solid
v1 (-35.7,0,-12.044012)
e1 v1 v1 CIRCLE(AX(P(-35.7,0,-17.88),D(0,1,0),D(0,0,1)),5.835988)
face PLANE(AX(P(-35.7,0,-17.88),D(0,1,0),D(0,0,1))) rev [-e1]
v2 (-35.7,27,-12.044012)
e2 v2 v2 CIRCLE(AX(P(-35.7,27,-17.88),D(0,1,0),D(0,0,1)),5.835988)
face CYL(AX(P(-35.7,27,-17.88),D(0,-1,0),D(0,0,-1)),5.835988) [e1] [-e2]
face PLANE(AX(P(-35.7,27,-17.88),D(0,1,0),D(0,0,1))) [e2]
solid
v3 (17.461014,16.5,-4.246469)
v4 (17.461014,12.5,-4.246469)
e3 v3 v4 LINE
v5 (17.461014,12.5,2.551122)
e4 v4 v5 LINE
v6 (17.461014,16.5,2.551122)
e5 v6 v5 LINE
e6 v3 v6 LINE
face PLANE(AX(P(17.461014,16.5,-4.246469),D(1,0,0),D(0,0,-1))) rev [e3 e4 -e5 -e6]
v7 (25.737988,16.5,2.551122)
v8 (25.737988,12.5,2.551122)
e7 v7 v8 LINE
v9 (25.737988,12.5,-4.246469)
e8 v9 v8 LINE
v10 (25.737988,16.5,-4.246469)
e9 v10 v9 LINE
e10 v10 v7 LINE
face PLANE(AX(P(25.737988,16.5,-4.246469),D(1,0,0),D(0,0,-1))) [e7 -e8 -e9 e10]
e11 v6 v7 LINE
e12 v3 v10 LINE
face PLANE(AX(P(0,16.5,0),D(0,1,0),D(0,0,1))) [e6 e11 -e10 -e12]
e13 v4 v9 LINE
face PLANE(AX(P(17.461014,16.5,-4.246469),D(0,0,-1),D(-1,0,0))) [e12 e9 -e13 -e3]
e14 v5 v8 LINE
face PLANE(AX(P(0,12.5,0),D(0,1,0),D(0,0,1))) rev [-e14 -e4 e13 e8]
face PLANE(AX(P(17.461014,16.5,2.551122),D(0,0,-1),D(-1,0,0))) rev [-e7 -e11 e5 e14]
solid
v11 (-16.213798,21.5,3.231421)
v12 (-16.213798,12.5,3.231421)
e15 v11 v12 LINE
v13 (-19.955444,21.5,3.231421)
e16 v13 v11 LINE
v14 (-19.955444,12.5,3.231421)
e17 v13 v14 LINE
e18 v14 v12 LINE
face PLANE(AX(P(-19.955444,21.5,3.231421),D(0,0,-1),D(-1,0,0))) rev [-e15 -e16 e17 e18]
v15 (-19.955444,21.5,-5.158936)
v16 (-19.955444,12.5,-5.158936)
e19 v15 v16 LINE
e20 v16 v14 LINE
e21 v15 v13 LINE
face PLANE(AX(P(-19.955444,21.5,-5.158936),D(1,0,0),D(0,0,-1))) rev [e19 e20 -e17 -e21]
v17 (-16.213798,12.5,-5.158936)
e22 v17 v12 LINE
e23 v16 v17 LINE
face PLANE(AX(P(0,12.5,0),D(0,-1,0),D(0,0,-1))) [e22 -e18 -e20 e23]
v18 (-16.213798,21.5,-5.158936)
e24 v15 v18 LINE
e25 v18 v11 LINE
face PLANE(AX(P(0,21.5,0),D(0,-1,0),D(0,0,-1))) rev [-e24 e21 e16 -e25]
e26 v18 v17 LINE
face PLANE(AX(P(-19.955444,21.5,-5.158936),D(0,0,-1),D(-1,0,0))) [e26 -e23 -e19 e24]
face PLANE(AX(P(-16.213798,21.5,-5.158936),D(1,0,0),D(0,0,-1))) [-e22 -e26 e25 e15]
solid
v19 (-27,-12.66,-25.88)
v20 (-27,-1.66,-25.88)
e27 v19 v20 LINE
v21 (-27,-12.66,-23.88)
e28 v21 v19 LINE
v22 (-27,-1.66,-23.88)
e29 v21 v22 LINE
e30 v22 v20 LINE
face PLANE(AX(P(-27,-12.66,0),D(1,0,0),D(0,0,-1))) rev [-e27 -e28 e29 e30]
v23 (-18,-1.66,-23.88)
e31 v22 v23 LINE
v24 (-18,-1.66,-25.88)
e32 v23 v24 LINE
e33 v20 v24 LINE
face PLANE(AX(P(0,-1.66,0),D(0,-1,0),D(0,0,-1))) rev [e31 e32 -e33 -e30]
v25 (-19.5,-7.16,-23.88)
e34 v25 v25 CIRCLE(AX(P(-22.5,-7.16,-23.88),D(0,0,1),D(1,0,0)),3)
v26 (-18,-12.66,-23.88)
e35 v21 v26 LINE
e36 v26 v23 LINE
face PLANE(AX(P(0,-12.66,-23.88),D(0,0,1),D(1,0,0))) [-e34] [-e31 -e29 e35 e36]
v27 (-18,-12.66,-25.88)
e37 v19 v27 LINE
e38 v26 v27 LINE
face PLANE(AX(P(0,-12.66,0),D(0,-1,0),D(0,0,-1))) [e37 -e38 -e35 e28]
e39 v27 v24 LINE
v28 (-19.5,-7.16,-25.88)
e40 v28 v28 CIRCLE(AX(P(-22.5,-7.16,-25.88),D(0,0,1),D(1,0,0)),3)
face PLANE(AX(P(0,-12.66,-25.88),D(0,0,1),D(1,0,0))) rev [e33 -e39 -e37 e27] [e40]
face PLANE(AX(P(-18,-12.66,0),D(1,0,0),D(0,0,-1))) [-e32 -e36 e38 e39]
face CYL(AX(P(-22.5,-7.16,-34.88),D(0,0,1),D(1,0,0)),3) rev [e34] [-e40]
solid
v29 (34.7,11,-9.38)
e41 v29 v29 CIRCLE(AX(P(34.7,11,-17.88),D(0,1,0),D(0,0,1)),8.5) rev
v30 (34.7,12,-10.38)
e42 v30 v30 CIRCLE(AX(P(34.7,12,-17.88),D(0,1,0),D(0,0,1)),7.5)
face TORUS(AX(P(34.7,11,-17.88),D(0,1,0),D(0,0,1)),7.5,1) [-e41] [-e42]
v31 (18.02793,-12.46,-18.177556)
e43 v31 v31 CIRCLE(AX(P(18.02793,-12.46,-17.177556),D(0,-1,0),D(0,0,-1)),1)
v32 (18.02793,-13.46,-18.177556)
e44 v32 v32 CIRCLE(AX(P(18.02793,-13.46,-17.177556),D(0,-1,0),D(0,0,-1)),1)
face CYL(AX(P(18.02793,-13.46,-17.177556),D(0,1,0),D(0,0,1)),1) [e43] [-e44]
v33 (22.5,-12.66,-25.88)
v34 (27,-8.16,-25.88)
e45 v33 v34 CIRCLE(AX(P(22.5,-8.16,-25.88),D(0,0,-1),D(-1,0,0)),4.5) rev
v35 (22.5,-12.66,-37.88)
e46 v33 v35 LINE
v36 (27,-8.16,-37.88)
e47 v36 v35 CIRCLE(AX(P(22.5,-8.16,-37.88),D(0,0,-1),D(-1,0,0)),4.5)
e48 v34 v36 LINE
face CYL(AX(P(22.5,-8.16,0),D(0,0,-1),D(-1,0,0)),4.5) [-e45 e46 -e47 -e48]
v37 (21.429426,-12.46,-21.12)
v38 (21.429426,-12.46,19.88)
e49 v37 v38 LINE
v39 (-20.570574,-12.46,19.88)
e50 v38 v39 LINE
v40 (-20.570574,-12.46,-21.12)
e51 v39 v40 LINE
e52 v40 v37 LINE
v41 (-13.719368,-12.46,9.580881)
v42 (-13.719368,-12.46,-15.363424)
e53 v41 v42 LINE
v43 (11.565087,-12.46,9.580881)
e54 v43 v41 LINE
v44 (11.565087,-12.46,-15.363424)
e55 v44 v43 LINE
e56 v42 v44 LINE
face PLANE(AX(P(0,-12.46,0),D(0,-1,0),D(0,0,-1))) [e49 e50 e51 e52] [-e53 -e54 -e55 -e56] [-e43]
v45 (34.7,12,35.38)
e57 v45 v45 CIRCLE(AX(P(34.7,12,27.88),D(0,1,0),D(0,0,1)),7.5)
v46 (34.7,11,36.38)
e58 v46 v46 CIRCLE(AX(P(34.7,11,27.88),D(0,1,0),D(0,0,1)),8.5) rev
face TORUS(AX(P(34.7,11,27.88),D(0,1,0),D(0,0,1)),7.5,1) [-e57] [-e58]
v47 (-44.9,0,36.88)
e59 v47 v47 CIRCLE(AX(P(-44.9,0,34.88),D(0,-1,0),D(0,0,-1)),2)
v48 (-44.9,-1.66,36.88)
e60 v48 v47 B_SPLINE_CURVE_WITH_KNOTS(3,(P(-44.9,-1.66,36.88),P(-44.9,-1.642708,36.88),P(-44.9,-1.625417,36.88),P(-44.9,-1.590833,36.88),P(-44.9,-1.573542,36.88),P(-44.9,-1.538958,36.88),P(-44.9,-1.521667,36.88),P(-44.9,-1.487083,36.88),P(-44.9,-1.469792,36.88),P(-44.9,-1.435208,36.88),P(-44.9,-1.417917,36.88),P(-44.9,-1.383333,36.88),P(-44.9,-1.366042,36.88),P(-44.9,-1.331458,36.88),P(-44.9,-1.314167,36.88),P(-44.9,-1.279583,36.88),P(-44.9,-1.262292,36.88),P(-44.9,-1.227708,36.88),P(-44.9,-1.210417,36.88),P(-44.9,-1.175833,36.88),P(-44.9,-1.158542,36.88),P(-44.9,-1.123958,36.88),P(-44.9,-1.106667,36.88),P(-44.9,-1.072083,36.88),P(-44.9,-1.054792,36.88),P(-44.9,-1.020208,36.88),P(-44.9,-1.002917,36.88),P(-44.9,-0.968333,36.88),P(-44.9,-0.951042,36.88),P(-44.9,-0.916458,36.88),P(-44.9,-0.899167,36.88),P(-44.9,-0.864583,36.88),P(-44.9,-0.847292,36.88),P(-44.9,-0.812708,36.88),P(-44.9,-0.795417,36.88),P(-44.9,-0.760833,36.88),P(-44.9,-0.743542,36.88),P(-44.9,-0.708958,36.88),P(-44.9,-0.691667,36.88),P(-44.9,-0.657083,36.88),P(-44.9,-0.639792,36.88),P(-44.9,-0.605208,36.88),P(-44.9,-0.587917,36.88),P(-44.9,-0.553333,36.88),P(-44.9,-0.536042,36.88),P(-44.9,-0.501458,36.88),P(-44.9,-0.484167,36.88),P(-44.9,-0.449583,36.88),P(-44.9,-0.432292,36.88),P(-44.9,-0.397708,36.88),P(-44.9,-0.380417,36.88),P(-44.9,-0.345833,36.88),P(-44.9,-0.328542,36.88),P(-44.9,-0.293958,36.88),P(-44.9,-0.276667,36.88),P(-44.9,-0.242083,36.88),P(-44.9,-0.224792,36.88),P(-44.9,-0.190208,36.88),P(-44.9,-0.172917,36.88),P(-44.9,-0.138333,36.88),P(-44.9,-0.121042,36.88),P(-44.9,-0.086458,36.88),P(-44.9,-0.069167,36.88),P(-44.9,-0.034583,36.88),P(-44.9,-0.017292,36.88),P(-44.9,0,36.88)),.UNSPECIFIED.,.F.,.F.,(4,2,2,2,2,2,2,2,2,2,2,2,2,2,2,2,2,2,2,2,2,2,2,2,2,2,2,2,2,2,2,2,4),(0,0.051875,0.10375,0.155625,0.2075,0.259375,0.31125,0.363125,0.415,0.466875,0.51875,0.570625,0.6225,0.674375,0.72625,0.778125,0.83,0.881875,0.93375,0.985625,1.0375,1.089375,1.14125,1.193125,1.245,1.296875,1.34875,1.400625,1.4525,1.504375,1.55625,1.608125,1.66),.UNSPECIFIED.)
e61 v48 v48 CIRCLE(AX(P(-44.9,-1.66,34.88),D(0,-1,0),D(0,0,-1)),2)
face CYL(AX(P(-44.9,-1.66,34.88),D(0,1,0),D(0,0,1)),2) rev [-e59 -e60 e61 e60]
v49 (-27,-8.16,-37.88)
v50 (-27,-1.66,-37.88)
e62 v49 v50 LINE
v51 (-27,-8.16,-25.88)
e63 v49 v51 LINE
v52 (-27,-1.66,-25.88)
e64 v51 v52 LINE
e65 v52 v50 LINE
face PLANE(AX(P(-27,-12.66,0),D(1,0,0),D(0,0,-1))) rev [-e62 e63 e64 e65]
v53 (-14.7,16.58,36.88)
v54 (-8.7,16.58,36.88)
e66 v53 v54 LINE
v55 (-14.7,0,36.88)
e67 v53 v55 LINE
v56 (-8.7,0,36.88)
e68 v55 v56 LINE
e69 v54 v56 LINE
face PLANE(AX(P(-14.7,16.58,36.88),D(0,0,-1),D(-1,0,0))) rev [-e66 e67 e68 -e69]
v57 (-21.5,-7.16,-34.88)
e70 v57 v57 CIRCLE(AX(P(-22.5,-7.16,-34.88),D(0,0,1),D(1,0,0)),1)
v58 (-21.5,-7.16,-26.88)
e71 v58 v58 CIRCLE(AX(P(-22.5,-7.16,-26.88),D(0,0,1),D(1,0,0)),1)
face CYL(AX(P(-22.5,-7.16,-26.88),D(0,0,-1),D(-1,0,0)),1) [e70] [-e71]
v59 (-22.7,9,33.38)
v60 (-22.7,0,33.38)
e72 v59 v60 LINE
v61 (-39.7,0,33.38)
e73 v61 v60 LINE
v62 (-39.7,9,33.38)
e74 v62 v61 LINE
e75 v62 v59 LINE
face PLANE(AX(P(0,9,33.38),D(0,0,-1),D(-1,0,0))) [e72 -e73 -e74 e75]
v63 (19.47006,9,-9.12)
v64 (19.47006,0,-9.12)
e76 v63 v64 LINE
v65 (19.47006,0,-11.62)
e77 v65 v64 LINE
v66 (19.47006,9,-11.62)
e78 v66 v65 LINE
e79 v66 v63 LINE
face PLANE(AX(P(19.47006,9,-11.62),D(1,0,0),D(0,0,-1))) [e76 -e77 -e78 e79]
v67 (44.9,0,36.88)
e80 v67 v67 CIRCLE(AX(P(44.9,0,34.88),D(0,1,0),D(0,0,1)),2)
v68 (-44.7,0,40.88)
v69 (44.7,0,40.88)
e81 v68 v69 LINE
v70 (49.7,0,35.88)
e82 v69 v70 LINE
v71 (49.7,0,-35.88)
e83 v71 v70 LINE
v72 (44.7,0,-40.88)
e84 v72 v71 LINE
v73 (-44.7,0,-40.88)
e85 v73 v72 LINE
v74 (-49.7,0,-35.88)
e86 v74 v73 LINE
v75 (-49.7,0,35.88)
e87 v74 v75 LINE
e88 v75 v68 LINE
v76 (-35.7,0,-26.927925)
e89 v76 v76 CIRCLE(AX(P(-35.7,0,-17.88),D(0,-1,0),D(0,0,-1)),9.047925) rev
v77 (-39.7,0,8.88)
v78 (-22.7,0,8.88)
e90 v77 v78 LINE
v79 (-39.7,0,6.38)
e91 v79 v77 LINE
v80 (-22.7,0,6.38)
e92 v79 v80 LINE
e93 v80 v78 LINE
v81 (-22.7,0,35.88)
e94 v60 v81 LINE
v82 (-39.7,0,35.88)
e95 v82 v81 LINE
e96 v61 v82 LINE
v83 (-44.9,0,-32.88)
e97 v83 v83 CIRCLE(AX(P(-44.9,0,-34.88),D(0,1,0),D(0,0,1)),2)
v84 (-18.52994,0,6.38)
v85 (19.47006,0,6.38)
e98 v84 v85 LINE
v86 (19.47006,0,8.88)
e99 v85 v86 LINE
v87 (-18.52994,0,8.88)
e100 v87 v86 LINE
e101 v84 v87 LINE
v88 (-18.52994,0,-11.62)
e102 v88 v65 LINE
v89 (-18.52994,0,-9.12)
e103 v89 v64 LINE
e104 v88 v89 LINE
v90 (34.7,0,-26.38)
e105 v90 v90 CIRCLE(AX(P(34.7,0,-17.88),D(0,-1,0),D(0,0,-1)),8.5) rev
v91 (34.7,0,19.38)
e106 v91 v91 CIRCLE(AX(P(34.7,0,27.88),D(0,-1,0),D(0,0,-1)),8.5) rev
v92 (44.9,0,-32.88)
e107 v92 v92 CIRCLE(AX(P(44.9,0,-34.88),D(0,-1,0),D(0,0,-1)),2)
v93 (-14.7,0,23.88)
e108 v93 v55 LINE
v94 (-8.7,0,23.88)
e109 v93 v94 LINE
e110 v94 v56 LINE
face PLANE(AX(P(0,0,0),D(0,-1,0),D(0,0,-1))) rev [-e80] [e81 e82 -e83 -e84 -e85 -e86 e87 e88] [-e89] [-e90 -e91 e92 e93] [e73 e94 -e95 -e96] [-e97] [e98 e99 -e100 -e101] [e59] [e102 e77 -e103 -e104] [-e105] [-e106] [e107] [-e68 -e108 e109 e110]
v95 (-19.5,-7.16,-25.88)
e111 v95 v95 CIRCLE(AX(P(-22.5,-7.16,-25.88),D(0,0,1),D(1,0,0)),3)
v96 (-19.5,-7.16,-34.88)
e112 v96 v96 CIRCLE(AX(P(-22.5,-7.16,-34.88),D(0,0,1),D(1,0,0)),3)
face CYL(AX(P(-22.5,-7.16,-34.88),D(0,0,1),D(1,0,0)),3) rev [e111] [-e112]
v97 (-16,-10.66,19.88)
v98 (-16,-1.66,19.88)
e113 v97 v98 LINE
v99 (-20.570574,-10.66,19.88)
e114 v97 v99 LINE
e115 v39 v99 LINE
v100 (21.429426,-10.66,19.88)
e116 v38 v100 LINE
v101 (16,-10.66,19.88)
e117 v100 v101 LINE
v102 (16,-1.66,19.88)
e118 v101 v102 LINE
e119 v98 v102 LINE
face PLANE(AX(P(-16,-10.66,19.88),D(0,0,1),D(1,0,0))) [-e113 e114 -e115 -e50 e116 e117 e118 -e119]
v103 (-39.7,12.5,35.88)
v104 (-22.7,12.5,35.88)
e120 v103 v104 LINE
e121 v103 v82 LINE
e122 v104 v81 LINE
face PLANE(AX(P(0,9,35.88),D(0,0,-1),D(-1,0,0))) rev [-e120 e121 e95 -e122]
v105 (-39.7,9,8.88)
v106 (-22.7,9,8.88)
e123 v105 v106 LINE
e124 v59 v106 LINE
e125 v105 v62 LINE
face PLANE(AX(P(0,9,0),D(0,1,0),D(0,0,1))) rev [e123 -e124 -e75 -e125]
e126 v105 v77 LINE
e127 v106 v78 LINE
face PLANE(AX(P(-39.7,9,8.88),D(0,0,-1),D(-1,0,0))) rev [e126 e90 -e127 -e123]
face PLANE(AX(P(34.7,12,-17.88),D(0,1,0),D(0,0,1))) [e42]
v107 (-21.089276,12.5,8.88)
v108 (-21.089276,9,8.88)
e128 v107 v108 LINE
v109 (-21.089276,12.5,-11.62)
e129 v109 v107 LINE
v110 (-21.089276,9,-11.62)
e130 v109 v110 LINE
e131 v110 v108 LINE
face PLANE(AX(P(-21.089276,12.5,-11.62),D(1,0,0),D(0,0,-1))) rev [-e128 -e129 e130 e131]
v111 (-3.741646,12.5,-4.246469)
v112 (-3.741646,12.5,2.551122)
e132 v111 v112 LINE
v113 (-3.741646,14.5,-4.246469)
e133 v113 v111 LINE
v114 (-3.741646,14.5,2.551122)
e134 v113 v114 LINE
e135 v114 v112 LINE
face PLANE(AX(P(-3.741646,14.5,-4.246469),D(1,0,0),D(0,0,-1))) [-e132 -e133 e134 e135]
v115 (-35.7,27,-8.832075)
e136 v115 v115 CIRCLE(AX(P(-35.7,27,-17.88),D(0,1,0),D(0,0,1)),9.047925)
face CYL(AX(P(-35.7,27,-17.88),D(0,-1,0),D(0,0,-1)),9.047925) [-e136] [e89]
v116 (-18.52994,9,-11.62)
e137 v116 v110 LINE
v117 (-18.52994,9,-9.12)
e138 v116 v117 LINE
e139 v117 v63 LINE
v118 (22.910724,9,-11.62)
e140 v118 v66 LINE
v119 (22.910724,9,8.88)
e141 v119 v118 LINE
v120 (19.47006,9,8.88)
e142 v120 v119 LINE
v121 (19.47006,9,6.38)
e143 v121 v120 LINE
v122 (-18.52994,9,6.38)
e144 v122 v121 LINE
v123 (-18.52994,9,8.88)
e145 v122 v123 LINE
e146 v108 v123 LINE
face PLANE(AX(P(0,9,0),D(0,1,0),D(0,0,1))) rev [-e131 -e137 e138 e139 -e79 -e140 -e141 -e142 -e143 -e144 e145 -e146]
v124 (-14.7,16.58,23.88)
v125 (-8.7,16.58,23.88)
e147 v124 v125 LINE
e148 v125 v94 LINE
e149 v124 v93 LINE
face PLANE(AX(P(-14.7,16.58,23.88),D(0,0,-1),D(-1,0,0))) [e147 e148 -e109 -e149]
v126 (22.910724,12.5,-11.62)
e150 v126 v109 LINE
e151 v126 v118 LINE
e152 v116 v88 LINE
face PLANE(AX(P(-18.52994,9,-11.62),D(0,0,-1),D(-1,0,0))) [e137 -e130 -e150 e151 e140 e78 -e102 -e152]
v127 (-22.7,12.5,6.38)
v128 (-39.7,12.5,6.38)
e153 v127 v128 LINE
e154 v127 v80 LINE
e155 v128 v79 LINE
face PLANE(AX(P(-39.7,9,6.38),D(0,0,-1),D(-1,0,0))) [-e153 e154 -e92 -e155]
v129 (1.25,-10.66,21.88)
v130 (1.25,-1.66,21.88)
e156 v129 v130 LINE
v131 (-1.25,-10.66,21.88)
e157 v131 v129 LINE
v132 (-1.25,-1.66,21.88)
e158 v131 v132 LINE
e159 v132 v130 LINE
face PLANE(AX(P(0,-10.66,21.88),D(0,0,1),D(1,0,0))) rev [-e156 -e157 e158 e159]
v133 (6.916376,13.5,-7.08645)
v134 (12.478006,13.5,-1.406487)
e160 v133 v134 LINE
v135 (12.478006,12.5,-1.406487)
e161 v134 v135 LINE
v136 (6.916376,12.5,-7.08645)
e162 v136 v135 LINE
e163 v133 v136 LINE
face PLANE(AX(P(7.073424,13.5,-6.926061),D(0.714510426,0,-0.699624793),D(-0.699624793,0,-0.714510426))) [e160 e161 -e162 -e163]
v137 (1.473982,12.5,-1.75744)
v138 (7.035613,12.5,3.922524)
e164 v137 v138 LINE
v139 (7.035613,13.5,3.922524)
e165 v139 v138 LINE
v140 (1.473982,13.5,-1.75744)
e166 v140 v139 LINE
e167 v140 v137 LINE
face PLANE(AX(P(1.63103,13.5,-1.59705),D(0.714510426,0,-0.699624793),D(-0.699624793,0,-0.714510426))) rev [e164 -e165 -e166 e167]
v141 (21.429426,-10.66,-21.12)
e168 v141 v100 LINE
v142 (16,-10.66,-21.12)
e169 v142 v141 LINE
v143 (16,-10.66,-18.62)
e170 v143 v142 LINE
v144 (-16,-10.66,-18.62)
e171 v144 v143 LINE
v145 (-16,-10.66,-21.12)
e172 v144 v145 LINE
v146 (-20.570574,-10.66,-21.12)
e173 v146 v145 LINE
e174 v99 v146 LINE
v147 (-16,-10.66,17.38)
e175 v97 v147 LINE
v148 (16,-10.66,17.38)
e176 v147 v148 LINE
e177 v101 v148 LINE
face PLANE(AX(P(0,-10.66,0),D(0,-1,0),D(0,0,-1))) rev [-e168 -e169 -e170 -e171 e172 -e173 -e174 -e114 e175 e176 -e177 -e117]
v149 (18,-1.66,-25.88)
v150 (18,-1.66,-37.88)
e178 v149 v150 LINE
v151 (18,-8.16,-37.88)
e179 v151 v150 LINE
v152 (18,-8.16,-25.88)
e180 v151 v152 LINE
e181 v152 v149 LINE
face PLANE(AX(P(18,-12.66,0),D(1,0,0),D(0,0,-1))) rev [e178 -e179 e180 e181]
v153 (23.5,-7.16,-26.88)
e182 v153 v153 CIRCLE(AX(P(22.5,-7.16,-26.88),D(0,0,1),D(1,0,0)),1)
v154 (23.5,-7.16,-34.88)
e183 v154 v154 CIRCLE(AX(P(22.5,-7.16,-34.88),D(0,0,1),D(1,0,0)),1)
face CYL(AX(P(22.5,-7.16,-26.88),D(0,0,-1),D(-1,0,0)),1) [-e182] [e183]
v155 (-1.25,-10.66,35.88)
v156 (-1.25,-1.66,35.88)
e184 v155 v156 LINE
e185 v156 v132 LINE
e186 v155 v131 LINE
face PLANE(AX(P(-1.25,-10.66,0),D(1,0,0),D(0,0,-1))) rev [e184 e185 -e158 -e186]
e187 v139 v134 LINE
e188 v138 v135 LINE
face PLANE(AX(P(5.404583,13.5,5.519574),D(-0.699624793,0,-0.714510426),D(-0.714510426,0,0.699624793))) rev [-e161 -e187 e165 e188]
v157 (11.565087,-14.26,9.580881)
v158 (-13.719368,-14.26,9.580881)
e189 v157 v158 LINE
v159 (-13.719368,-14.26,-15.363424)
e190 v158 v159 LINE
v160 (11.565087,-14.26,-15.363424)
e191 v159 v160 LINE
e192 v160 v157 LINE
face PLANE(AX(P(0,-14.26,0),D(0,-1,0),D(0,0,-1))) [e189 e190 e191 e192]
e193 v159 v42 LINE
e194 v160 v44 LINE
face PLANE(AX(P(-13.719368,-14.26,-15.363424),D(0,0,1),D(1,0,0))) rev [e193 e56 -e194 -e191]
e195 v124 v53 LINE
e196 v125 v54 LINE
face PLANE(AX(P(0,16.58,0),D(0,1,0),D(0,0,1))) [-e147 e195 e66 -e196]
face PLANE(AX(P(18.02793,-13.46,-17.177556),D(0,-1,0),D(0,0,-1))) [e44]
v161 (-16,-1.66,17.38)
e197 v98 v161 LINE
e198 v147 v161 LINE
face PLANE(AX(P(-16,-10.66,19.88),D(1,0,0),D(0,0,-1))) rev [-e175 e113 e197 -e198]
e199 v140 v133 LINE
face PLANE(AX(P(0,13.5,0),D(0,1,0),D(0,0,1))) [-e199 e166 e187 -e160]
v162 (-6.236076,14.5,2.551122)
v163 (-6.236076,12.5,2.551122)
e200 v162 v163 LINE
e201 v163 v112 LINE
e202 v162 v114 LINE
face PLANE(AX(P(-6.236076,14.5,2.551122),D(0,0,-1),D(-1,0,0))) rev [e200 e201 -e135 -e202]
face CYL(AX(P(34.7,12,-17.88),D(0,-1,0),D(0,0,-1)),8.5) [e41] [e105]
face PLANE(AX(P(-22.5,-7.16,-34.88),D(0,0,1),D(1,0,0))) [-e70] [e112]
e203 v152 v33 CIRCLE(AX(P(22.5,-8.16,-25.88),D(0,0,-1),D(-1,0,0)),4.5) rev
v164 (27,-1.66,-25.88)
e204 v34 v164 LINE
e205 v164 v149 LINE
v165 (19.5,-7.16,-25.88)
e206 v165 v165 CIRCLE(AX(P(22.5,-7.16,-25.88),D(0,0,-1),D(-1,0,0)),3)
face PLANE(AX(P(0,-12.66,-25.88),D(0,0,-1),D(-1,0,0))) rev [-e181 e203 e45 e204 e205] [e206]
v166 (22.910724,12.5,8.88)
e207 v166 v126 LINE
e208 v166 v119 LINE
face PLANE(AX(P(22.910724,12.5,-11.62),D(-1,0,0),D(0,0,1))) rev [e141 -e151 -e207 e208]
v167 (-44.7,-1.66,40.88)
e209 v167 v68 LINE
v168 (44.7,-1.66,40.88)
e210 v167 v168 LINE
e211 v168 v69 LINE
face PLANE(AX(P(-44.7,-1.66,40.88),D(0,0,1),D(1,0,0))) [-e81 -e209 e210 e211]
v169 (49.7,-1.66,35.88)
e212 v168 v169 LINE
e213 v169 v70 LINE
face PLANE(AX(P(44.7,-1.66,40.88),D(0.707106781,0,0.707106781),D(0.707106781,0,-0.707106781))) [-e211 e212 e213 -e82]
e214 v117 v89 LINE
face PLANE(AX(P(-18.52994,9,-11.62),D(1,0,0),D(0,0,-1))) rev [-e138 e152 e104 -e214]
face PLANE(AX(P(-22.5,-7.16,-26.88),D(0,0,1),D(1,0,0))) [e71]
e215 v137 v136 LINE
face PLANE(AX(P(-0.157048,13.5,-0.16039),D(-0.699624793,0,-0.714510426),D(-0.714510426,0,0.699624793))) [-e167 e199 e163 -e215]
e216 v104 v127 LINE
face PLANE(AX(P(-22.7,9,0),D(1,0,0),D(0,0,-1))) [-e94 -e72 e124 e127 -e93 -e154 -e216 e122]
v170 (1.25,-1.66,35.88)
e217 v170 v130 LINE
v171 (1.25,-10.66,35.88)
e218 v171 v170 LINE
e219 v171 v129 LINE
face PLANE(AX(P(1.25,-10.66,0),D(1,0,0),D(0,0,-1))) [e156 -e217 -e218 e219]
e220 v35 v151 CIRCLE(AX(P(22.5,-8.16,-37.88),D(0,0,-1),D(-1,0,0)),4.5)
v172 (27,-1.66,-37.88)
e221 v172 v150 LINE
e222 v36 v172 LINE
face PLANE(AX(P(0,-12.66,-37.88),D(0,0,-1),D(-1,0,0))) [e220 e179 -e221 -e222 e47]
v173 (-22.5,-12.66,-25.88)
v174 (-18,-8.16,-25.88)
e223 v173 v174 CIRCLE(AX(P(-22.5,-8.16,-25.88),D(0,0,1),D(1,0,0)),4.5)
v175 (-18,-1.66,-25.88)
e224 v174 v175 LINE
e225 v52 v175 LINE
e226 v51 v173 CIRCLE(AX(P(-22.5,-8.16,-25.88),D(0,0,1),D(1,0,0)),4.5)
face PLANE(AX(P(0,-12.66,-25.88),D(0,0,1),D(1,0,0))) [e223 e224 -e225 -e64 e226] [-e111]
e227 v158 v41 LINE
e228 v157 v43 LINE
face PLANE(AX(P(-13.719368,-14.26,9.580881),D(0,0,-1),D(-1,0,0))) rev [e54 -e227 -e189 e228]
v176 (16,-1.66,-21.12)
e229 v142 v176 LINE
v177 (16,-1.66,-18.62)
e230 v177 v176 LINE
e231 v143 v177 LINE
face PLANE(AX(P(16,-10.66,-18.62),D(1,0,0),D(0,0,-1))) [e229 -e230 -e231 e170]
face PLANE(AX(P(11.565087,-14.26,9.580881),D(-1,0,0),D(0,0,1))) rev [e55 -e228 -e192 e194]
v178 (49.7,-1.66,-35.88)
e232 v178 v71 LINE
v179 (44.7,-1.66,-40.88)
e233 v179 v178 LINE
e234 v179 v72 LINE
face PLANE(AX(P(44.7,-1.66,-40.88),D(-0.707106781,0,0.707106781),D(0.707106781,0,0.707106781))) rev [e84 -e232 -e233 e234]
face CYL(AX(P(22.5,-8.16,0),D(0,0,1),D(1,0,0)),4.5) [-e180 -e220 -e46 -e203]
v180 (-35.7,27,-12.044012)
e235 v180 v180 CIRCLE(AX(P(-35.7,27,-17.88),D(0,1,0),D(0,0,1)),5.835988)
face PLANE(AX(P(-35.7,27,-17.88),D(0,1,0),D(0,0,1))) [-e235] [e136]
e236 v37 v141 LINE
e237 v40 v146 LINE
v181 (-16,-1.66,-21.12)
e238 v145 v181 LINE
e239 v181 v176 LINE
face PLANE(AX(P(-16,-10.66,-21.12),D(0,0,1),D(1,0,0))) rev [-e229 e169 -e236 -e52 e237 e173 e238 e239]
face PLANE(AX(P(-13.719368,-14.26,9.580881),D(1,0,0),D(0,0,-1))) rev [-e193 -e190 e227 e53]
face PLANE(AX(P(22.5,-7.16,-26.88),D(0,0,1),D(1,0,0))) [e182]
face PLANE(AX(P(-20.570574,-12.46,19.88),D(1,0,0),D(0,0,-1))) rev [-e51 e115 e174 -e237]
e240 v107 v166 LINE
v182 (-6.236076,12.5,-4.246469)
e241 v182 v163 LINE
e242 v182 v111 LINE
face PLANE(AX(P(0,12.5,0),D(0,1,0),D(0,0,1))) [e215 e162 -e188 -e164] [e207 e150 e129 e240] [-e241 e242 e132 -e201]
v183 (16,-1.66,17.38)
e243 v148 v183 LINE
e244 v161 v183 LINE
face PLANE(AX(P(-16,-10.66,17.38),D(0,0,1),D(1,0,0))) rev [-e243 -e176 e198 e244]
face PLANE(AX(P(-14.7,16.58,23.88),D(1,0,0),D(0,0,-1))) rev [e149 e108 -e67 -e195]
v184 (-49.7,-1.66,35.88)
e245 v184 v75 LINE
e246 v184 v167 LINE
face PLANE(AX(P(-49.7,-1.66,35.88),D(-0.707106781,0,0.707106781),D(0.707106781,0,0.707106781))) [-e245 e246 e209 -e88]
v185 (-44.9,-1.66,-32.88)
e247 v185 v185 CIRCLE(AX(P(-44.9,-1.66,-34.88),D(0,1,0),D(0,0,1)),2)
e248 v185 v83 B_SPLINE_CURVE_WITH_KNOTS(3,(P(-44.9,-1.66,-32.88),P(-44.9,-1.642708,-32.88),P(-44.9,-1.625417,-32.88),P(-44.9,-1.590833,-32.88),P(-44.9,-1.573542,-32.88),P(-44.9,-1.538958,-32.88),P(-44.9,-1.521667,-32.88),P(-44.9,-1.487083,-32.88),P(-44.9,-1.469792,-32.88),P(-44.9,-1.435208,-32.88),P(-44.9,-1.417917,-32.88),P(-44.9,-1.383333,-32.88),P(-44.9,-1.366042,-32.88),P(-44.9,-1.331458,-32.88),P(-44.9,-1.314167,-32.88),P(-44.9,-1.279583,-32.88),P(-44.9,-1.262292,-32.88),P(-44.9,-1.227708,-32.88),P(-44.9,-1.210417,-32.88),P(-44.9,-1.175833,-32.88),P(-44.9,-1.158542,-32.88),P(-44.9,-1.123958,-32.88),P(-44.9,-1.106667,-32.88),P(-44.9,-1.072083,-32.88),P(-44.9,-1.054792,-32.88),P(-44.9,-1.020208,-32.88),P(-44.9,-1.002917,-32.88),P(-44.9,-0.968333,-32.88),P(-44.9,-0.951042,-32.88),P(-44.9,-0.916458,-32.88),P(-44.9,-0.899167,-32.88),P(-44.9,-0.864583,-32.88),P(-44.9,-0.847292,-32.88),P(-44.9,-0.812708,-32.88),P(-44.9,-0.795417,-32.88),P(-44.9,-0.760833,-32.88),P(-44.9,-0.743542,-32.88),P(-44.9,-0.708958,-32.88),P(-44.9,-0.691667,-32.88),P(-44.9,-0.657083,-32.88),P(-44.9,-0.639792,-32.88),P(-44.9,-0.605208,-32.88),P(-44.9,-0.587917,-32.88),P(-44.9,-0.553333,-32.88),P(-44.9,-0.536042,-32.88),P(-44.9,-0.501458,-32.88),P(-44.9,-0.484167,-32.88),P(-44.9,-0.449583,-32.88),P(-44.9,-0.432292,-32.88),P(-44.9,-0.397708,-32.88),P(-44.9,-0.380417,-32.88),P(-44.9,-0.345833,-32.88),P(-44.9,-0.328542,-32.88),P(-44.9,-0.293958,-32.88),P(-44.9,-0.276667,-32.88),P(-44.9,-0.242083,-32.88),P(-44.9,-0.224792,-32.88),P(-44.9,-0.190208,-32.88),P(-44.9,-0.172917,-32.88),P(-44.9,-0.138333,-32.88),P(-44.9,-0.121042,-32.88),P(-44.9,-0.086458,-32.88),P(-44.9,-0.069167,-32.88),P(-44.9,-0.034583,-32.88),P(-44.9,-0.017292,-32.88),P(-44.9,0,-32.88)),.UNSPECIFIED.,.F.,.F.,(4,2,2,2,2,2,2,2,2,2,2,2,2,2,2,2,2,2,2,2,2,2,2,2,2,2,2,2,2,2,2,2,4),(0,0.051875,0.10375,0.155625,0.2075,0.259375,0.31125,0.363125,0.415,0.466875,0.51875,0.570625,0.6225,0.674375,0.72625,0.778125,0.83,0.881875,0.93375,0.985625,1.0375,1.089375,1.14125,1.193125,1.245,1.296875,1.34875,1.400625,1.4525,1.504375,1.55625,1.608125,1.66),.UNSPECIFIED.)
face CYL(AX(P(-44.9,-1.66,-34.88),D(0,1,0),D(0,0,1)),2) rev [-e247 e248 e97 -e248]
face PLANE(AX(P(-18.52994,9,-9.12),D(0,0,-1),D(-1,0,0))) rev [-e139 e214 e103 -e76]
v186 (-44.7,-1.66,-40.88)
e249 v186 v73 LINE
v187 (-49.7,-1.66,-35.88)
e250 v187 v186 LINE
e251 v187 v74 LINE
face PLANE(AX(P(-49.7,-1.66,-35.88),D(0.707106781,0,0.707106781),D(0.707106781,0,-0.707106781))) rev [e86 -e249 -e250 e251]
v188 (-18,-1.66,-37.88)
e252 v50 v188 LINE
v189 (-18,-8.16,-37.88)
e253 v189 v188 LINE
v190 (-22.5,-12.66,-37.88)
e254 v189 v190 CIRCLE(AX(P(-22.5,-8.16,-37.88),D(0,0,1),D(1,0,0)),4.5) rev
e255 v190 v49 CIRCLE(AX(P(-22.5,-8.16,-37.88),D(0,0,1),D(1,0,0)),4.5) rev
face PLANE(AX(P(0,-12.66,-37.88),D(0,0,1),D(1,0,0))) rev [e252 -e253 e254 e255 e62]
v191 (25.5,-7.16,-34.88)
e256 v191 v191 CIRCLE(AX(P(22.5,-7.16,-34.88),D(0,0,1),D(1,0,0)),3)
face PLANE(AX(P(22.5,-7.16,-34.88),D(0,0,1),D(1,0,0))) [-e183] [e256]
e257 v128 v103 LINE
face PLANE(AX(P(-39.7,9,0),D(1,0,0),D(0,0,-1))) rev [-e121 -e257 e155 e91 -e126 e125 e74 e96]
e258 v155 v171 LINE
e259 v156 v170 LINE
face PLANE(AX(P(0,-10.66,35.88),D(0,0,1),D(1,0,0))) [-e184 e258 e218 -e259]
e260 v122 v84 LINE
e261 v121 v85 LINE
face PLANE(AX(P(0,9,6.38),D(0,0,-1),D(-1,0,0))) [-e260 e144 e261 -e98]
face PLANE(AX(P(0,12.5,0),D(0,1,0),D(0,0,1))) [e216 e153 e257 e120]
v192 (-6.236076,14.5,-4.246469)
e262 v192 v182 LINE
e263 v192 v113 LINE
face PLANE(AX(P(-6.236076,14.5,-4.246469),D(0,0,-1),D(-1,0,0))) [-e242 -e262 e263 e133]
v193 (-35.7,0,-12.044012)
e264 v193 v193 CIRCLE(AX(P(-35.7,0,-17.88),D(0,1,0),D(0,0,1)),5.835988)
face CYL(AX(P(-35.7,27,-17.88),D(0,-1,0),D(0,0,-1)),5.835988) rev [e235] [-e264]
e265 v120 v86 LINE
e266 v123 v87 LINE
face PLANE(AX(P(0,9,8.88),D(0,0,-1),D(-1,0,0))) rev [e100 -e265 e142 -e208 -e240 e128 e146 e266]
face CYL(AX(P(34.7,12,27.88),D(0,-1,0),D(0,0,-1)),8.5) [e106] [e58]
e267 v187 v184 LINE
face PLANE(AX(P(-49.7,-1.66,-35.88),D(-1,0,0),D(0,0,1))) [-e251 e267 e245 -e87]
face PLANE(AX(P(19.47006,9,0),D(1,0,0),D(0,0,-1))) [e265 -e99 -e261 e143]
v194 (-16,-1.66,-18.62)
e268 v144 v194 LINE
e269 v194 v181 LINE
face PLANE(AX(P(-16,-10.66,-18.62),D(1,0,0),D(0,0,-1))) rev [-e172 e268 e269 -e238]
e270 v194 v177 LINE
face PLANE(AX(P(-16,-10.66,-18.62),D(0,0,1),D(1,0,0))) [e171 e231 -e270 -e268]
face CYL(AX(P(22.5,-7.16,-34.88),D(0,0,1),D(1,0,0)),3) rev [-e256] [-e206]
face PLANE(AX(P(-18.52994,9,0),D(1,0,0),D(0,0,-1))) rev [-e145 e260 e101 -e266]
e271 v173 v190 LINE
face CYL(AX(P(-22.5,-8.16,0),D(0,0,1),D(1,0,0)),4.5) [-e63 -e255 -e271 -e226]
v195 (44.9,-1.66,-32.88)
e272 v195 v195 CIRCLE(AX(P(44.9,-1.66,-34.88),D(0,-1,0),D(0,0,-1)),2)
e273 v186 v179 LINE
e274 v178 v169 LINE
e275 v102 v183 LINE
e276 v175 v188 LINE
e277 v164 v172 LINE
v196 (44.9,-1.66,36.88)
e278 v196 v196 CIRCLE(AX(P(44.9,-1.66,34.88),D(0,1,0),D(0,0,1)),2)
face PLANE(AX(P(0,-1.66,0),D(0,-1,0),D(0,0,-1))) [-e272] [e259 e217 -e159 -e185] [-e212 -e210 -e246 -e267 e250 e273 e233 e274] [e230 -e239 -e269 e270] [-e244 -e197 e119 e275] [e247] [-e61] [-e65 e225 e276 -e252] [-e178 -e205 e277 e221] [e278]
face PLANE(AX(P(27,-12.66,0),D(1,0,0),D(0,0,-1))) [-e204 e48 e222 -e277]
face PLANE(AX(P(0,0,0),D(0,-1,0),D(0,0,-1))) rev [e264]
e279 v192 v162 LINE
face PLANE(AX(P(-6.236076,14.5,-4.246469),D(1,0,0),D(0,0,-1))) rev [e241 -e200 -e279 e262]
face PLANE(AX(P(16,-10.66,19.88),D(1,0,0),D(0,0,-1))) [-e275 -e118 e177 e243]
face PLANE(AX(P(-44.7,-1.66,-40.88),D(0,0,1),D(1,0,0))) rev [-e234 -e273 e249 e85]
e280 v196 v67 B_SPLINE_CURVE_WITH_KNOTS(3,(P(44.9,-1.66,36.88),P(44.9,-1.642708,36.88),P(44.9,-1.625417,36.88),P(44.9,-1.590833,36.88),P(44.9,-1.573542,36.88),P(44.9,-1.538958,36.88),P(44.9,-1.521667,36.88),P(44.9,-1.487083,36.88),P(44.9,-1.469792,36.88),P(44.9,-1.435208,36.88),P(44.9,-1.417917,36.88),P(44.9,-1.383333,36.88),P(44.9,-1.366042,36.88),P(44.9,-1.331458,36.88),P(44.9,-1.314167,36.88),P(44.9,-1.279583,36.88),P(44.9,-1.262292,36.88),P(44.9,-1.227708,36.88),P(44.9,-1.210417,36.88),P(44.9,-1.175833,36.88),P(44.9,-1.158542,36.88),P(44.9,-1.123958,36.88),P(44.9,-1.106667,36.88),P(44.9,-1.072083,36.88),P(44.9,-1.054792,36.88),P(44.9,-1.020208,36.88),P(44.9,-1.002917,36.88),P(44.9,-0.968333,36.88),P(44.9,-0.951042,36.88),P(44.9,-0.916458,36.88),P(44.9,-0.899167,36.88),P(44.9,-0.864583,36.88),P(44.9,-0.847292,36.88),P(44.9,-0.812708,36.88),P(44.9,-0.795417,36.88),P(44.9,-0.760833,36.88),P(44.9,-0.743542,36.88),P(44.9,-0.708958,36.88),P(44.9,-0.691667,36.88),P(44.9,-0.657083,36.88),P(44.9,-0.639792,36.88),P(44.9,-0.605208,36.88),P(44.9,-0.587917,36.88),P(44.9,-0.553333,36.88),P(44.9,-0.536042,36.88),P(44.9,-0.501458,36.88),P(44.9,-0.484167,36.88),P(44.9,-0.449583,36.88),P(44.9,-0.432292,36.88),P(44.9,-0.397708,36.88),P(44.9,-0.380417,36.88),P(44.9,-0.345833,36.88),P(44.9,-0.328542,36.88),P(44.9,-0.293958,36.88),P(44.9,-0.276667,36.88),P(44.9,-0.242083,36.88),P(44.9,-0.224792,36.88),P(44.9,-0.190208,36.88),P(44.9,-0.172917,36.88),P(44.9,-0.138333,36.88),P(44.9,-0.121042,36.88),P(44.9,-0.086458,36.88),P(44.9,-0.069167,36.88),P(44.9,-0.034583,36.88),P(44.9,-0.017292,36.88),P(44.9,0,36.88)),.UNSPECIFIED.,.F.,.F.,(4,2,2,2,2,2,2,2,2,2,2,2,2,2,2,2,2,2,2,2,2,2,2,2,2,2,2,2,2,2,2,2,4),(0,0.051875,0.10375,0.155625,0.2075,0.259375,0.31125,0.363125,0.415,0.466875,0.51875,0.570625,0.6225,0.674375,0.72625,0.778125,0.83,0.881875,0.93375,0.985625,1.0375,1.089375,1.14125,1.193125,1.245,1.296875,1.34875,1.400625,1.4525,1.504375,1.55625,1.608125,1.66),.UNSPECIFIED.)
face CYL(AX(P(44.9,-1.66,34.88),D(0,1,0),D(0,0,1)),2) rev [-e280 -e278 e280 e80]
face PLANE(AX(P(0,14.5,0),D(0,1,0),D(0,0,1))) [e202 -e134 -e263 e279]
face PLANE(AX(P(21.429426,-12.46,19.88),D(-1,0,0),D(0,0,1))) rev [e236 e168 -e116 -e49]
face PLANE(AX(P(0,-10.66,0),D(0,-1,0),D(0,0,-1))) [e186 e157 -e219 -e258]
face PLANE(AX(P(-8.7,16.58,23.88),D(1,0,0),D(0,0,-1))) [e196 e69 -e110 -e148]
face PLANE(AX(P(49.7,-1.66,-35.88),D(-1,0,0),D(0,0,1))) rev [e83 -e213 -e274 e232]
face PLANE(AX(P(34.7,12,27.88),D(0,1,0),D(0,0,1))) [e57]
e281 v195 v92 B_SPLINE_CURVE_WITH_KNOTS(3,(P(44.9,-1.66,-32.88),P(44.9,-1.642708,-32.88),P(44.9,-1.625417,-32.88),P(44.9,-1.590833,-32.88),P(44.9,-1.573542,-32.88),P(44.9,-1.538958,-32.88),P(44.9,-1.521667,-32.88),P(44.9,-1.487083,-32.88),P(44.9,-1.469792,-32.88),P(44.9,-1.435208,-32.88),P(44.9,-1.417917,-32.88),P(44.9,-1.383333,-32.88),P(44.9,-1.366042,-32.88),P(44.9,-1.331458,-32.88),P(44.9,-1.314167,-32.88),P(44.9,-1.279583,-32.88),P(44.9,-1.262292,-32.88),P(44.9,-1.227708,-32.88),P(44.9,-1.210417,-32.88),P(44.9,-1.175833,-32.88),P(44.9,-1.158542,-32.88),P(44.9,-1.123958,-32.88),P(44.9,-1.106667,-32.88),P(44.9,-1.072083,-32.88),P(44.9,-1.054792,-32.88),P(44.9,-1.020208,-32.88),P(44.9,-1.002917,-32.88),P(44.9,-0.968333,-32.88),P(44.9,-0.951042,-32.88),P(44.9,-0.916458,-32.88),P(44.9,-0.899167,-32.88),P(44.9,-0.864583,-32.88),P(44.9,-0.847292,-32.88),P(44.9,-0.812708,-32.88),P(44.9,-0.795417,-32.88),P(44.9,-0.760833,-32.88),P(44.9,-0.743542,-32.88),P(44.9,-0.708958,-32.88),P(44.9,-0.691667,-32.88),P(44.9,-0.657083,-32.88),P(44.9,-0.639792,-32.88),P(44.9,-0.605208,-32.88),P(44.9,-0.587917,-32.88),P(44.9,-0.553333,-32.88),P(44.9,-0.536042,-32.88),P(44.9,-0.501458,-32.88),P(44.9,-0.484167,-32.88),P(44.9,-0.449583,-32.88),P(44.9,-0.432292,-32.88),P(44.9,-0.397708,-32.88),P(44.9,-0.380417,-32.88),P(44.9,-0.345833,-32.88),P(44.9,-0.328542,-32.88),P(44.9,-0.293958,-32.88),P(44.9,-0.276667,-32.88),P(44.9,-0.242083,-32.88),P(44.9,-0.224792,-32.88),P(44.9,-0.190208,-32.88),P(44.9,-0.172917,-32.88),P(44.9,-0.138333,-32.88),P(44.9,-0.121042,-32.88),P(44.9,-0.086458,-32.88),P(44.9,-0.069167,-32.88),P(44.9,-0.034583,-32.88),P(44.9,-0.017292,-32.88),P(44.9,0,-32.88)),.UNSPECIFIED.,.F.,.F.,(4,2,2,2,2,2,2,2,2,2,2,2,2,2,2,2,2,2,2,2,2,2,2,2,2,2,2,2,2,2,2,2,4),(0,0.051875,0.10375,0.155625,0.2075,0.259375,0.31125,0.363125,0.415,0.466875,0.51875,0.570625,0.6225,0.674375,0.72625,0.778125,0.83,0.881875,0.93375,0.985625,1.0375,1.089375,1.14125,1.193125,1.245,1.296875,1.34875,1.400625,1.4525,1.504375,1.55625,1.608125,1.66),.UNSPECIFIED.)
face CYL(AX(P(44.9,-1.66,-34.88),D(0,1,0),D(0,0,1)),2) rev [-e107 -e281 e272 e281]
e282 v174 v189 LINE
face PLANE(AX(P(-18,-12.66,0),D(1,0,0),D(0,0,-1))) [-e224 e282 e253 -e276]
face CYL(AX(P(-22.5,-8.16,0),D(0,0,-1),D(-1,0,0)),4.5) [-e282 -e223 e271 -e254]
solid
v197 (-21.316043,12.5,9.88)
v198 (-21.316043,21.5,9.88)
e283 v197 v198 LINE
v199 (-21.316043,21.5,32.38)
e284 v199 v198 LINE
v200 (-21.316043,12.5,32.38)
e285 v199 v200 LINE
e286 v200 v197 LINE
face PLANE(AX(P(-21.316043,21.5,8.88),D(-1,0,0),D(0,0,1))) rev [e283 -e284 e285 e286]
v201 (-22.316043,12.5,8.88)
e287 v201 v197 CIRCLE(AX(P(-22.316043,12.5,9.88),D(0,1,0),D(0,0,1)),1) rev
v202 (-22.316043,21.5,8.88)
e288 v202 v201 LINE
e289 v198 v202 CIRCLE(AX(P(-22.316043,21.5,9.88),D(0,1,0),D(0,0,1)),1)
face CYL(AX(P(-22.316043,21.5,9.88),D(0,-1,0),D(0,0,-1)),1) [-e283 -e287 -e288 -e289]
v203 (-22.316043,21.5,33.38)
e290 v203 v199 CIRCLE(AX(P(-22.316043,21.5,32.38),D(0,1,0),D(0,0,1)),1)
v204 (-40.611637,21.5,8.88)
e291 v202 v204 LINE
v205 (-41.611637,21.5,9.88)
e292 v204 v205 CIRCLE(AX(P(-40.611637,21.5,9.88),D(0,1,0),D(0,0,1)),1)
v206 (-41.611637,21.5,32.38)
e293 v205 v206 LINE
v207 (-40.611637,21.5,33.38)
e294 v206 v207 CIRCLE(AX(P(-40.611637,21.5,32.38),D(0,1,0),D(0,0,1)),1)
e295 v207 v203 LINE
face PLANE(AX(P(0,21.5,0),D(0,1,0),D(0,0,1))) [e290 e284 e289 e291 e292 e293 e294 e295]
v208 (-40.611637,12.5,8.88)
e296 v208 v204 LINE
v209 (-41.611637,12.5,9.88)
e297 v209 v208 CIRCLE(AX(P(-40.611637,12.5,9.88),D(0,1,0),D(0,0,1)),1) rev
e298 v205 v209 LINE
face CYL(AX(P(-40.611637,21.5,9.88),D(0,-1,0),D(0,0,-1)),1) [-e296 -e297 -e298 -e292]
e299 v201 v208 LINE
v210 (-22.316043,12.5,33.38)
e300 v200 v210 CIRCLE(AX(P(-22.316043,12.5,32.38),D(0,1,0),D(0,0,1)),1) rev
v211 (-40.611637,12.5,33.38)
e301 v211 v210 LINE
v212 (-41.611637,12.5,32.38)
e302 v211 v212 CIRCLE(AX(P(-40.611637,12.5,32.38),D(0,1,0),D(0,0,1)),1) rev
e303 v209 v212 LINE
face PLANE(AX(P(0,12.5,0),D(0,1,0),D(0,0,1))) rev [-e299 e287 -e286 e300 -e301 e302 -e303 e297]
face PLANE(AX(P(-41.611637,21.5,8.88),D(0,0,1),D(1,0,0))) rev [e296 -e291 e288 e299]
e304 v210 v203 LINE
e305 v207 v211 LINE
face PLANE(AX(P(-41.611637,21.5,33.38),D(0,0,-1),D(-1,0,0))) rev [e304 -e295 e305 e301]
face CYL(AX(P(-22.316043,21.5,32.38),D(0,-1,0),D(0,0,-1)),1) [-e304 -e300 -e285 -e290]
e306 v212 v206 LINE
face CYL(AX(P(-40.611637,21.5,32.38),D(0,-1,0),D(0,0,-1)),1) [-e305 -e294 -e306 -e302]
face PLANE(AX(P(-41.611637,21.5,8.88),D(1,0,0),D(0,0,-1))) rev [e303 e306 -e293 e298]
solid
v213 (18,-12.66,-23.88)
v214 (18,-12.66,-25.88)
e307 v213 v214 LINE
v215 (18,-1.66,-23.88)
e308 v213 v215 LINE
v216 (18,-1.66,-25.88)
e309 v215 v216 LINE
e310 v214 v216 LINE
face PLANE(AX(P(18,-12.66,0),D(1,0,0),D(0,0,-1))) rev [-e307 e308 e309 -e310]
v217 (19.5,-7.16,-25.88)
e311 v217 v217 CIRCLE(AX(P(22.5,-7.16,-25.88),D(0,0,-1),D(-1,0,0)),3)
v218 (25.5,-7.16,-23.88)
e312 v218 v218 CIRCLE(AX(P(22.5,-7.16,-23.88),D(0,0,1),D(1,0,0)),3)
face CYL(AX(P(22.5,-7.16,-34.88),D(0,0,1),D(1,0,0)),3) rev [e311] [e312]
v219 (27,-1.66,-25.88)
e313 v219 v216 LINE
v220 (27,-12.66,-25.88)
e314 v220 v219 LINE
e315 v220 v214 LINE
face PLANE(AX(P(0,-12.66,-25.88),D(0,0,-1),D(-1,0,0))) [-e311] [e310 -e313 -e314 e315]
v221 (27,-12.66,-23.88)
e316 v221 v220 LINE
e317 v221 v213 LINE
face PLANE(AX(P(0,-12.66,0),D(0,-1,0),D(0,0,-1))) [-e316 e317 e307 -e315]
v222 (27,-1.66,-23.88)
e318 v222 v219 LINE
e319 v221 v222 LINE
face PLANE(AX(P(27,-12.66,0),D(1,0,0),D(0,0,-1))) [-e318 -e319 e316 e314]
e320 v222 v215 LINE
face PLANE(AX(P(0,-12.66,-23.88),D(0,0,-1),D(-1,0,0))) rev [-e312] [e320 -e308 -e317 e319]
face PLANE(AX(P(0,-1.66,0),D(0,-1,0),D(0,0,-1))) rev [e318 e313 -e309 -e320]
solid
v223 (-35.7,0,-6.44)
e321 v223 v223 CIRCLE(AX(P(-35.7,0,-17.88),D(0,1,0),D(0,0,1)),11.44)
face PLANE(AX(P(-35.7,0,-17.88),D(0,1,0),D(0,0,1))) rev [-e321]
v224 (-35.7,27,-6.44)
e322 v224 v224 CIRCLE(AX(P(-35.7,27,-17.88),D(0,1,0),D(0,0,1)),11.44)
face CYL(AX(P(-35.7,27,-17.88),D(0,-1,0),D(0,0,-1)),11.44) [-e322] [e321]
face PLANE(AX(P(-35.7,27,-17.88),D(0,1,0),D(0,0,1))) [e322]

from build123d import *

# Parameters (mm, degrees)
SKETCH_1_R          = 2
EXTRUDE_1_DEPTH     = 1.66
SKETCH_1_3_W        = 38
SKETCH_1_3_H        = 2.5
SKETCH_1_3_W_2      = 17
EXTRUDE_2_DEPTH     = 9
SKETCH_1_4_W        = 6
SKETCH_1_4_H        = 13
EXTRUDE_3_DEPTH     = 16.58
SKETCH_2_R          = 9.047924982
SKETCH_2_R_2        = 5.835988173
EXTRUDE_4_DEPTH     = 27
SKETCH_2_4_R        = 5.835988173
EXTRUDE_6_DEPTH     = 27
SKETCH_1_5_R        = 11.44
EXTRUDE_7_DEPTH     = 27
SKETCH_1_6_R        = 8.5
EXTRUDE_8_DEPTH     = 12
FILLET_1_R          = 1
SKETCH_1_7_R        = 8.5
EXTRUDE_9_DEPTH     = 12
FILLET_2_R          = 1
SKETCH_4_W          = 2.5
SKETCH_4_H          = 14
SKETCH_4_W_2        = 32
SKETCH_4_H_2        = 2.5
EXTRUDE_10_DEPTH    = 9
SKETCH_4_5_W        = 9
SKETCH_4_5_H        = 12
EXTRUDE_11_DEPTH    = 11
FILLET_4_R          = 4.5
SKETCH_4_6_W        = 9
SKETCH_4_6_H        = 2
EXTRUDE_12_DEPTH    = 11
EXTRUDE_12_2_DEPTH  = 11
SKETCH_5_R          = 3
CUT_EXTRUDE_1_DEPTH = 11
SKETCH_6_R          = 1
EXTRUDE_13_DEPTH    = 8
SKETCH_7_W          = 44
SKETCH_7_H          = 20.5
SKETCH_7_W_2        = 17
SKETCH_7_H_2        = 29.5
EXTRUDE_14_DEPTH    = 3.5
EXTRUDE_15_DEPTH    = 1
SKETCH_8_3_W        = 8.276974044
SKETCH_8_3_H        = 6.797590772
EXTRUDE_16_DEPTH    = 4
SKETCH_8_4_W        = 3.741645801
SKETCH_8_4_H        = 8.39035725
EXTRUDE_17_DEPTH    = 9
SKETCH_8_5_W        = 2.494430534
SKETCH_8_5_H        = 6.797590772
EXTRUDE_18_DEPTH    = 2
SKETCH_9_W          = 20.295593889
SKETCH_9_H          = 24.5
EXTRUDE_19_DEPTH    = 9
SKETCH_10_W         = 42
SKETCH_10_H         = 41
EXTRUDE_20_DEPTH    = 1.8
SKETCH_11_W         = 25.284454957
SKETCH_11_H         = 24.944305338
EXTRUDE_21_DEPTH    = 1.8
SKETCH_12_R         = 1
EXTRUDE_22_DEPTH    = 1
FILLET_5_R          = 1


with BuildPart() as part:
    # 草图1 → 凸台-拉伸1 (new body)
    with BuildSketch(Plane(origin=(0, 0, 0), x_dir=(1, 0, 0), z_dir=(0, 1, 0))):
        Polygon((-49.7, 35.88), (-44.7, 40.88), (44.7, 40.88), (49.7, 35.88), (49.7, -35.88), (44.7, -40.88), (-44.7, -40.88), (-49.7, -35.88), align=None)
        with Locations(Location((-44.9, 34.88, 0), (0, 0, 270))):
            Circle(SKETCH_1_R, mode=Mode.SUBTRACT)
        with Locations(Location((44.9, 34.88, 0), (0, 0, 270))):
            Circle(SKETCH_1_R, mode=Mode.SUBTRACT)
        with Locations(Location((44.9, -34.88, 0), (0, 0, 270))):
            Circle(SKETCH_1_R, mode=Mode.SUBTRACT)
        with Locations(Location((-44.9, -34.88, 0), (0, 0, 270))):
            Circle(SKETCH_1_R, mode=Mode.SUBTRACT)
    extrude(amount=-EXTRUDE_1_DEPTH)

    # 草图1<3> → 凸台-拉伸2 (add)
    with BuildSketch(Plane(origin=(0, 0, 0), x_dir=(1, 0, 0), z_dir=(0, 1, 0))):
        with Locations((0.470060106, -7.63)):
            Rectangle(SKETCH_1_3_W, SKETCH_1_3_H)
        with Locations((-31.2, -34.63)):
            Rectangle(SKETCH_1_3_W_2, SKETCH_1_3_H)
        with Locations((0.470060106, 10.37)):
            Rectangle(SKETCH_1_3_W, SKETCH_1_3_H)
        with Locations((-31.2, -7.63)):
            Rectangle(SKETCH_1_3_W_2, SKETCH_1_3_H)
    extrude(amount=EXTRUDE_2_DEPTH)

    # 草图1<4> → 凸台-拉伸3 (add)
    with BuildSketch(Plane(origin=(0, 0, 0), x_dir=(1, 0, 0), z_dir=(0, 1, 0))):
        with Locations((-11.7, -30.38)):
            Rectangle(SKETCH_1_4_W, SKETCH_1_4_H)
    extrude(amount=EXTRUDE_3_DEPTH)

    # 草图2 → 凸台-拉伸4 (add)
    with BuildSketch(Plane(origin=(0, 0, 0), x_dir=(1, 0, 0), z_dir=(0, 1, 0))):
        with Locations(Location((-35.7, 17.88, 0), (0, 0, 90))):
            Circle(SKETCH_2_R)
        with Locations(Location((-35.7, 17.88, 0), (0, 0, 270))):
            Circle(SKETCH_2_R_2, mode=Mode.SUBTRACT)
    extrude(amount=EXTRUDE_4_DEPTH)

    # 草图1<6> → 凸台-拉伸8 (add)
    with BuildSketch(Plane(origin=(0, 0, 0), x_dir=(1, 0, 0), z_dir=(0, 1, 0))):
        with Locations(Location((34.7, 17.88, 0), (0, 0, 90))):
            Circle(SKETCH_1_6_R)
    extrude(amount=EXTRUDE_8_DEPTH)

    # 圆角1
    fillet_1_edges = [part.edges().sort_by_distance(p)[0] for p in [
        (34.7, 12, -9.38),
    ]]
    fillet(fillet_1_edges, radius=FILLET_1_R)

    # 草图1<7> → 凸台-拉伸9 (add)
    with BuildSketch(Plane(origin=(0, 0, 0), x_dir=(1, 0, 0), z_dir=(0, 1, 0))):
        with Locations(Location((34.7, -27.88, 0), (0, 0, 90))):
            Circle(SKETCH_1_7_R)
    extrude(amount=EXTRUDE_9_DEPTH)

    # 圆角2
    fillet_2_edges = [part.edges().sort_by_distance(p)[0] for p in [
        (34.7, 12, 36.38),
    ]]
    fillet(fillet_2_edges, radius=FILLET_2_R)

    # 草图4 → 凸台-拉伸10 (add)
    with BuildSketch(Plane.XZ.offset(1.66)):
        with Locations((0, 28.88)):
            Rectangle(SKETCH_4_W, SKETCH_4_H)
        with Locations((0, -19.87)):
            Rectangle(SKETCH_4_W_2, SKETCH_4_H_2)
        with Locations((0, 18.63)):
            Rectangle(SKETCH_4_W_2, SKETCH_4_H_2)
    extrude(amount=EXTRUDE_10_DEPTH)

    # 草图4<5> → 凸台-拉伸11 (add)
    with BuildSketch(Plane.XZ.offset(1.66)):
        with Locations((-22.5, -31.88)):
            Rectangle(SKETCH_4_5_W, SKETCH_4_5_H)
        with Locations((22.5, -31.88)):
            Rectangle(SKETCH_4_5_W, SKETCH_4_5_H)
    extrude(amount=EXTRUDE_11_DEPTH)

    # 圆角4
    fillet_4_edges = [part.edges().sort_by_distance(p)[0] for p in [
        (27, -12.66, -31.88),
        (18, -12.66, -31.88),
        (-18, -12.66, -31.88),
        (-27, -12.66, -31.88),
    ]]
    fillet(fillet_4_edges, radius=FILLET_4_R - 0.0001)  # a hair under: the kernel refuses the full size


with BuildPart() as body_2:
    # 草图2<4> → 凸台-拉伸6 (new body)
    with BuildSketch(Plane(origin=(0, 0, 0), x_dir=(1, 0, 0), z_dir=(0, 1, 0))):
        with Locations(Location((-35.7, 17.88, 0), (0, 0, 270))):
            Circle(SKETCH_2_4_R)
    extrude(amount=EXTRUDE_6_DEPTH)


with BuildPart() as body_3:
    # 草图1<5> → 凸台-拉伸7 (new body)
    with BuildSketch(Plane(origin=(0, 0, 0), x_dir=(1, 0, 0), z_dir=(0, 1, 0))):
        with Locations(Location((-35.7, 17.88, 0), (0, 0, 270))):
            Circle(SKETCH_1_5_R)
    extrude(amount=EXTRUDE_7_DEPTH)


with BuildPart() as body_4:
    # 草图4<6> → 凸台-拉伸12 (new body)
    with BuildSketch(Plane.XZ.offset(1.66)):
        with Locations((-22.5, -24.88)):
            Rectangle(SKETCH_4_6_W, SKETCH_4_6_H)
    extrude(amount=EXTRUDE_12_DEPTH)


with BuildPart() as body_5:
    # 草图4<6> → Extrude 12 2 (new body)
    with BuildSketch(Plane.XZ.offset(1.66)):
        with Locations((22.5, -24.88)):
            Rectangle(SKETCH_4_6_W, SKETCH_4_6_H)
    extrude(amount=EXTRUDE_12_2_DEPTH)


with BuildPart() as cut_extrude_1_tool:
    # 草图5 → 切除-拉伸1 (new body)
    with BuildSketch(Plane.XY.offset(-23.88)):
        with Locations((-22.5, -7.16)):
            Circle(SKETCH_5_R)
        with Locations((22.5, -7.16)):
            Circle(SKETCH_5_R)
    extrude(amount=-CUT_EXTRUDE_1_DEPTH)


with BuildPart() as part_1:
    add(part.part)

    # 切除-拉伸1: cut by cut_extrude_1_tool
    add(cut_extrude_1_tool.part, mode=Mode.SUBTRACT)

    # 草图6 → 凸台-拉伸13 (add)
    with BuildSketch(Plane.XY.offset(-34.88)):
        with Locations((-22.5, -7.16)):
            Circle(SKETCH_6_R)
        with Locations((22.5, -7.16)):
            Circle(SKETCH_6_R)
    extrude(amount=EXTRUDE_13_DEPTH)

    # 草图7 → 凸台-拉伸14 (add)
    with BuildSketch(Plane(origin=(0, 9, 0), x_dir=(1, 0, 0), z_dir=(0, 1, 0))):
        with Locations((0.910723668, 1.37)):
            Rectangle(SKETCH_7_W, SKETCH_7_H)
        with Locations((-31.2, -21.13)):
            Rectangle(SKETCH_7_W_2, SKETCH_7_H_2)
    extrude(amount=EXTRUDE_14_DEPTH)

    # 草图8 → 凸台-拉伸15 (add)
    with BuildSketch(Plane(origin=(0, 12.5, 0), x_dir=(1, 0, 0), z_dir=(0, 1, 0))):
        Polygon((1.473981679, 1.757439694), (7.035612597, -3.922523796), (12.478006489, 1.40648689), (6.916375571, 7.08645038), align=None)
    extrude(amount=EXTRUDE_15_DEPTH)

    # 草图8<5> → 凸台-拉伸18 (add)
    with BuildSketch(Plane(origin=(0, 12.5, 0), x_dir=(1, 0, 0), z_dir=(0, 1, 0))):
        with Locations((-4.988861068, 0.847673249)):
            Rectangle(SKETCH_8_5_W, SKETCH_8_5_H)
    extrude(amount=EXTRUDE_18_DEPTH)

    # 草图10 → 凸台-拉伸20 (add)
    with BuildSketch(Plane(origin=(0, -10.66, 0), x_dir=(-1, 0, 0), z_dir=(0, -1, 0))):
        with Locations((-0.42942595, 0.62)):
            Rectangle(SKETCH_10_W, SKETCH_10_H)
    extrude(amount=EXTRUDE_20_DEPTH)

    # 草图11 → 凸台-拉伸21 (add)
    with BuildSketch(Plane.XZ.offset(12.46)):
        with Locations((-1.077140458, -2.891271755)):
            Rectangle(SKETCH_11_W, SKETCH_11_H)
    extrude(amount=EXTRUDE_21_DEPTH)

    # 草图12 → 凸台-拉伸22 (add)
    with BuildSketch(Plane(origin=(0, -12.46, 0), x_dir=(-1, 0, 0), z_dir=(0, -1, 0))):
        with Locations(Location((-18.027929767, 17.177555722, 0), (0, 0, 90))):
            Circle(SKETCH_12_R)
    extrude(amount=EXTRUDE_22_DEPTH)


with BuildPart() as body_4_1:
    add(body_4.part)

    # 切除-拉伸1: cut by cut_extrude_1_tool
    add(cut_extrude_1_tool.part, mode=Mode.SUBTRACT)


with BuildPart() as body_5_1:
    add(body_5.part)

    # 切除-拉伸1: cut by cut_extrude_1_tool
    add(cut_extrude_1_tool.part, mode=Mode.SUBTRACT)


with BuildPart() as body_6:
    # 草图8<3> → 凸台-拉伸16 (new body)
    with BuildSketch(Plane(origin=(0, 12.5, 0), x_dir=(1, 0, 0), z_dir=(0, 1, 0))):
        with Locations((21.599500759, 0.847673249)):
            Rectangle(SKETCH_8_3_W, SKETCH_8_3_H)
    extrude(amount=EXTRUDE_16_DEPTH)


with BuildPart() as body_7:
    # 草图8<4> → 凸台-拉伸17 (new body)
    with BuildSketch(Plane(origin=(0, 12.5, 0), x_dir=(1, 0, 0), z_dir=(0, 1, 0))):
        with Locations((-18.084621371, 0.963757252)):
            Rectangle(SKETCH_8_4_W, SKETCH_8_4_H)
    extrude(amount=EXTRUDE_17_DEPTH)


with BuildPart() as body_8:
    # 草图9 → 凸台-拉伸19 (new body)
    with BuildSketch(Plane(origin=(0, 12.5, 0), x_dir=(1, 0, 0), z_dir=(0, 1, 0))):
        with Locations((-31.463839689, -21.13)):
            Rectangle(SKETCH_9_W, SKETCH_9_H)
    extrude(amount=EXTRUDE_19_DEPTH)

    # 圆角5
    fillet_5_edges = [body_8.edges().sort_by_distance(p)[0] for p in [
        (-41.611636633, 17, 8.88),
        (-21.316042744, 17, 8.88),
        (-21.316042744, 17, 33.38),
        (-41.611636633, 17, 33.38),
    ]]
    fillet(fillet_5_edges, radius=FILLET_5_R)


solid = Compound([body_2.part, body_3.part, part_1.part, body_4_1.part, body_5_1.part, body_6.part, body_7.part, body_8.part])
